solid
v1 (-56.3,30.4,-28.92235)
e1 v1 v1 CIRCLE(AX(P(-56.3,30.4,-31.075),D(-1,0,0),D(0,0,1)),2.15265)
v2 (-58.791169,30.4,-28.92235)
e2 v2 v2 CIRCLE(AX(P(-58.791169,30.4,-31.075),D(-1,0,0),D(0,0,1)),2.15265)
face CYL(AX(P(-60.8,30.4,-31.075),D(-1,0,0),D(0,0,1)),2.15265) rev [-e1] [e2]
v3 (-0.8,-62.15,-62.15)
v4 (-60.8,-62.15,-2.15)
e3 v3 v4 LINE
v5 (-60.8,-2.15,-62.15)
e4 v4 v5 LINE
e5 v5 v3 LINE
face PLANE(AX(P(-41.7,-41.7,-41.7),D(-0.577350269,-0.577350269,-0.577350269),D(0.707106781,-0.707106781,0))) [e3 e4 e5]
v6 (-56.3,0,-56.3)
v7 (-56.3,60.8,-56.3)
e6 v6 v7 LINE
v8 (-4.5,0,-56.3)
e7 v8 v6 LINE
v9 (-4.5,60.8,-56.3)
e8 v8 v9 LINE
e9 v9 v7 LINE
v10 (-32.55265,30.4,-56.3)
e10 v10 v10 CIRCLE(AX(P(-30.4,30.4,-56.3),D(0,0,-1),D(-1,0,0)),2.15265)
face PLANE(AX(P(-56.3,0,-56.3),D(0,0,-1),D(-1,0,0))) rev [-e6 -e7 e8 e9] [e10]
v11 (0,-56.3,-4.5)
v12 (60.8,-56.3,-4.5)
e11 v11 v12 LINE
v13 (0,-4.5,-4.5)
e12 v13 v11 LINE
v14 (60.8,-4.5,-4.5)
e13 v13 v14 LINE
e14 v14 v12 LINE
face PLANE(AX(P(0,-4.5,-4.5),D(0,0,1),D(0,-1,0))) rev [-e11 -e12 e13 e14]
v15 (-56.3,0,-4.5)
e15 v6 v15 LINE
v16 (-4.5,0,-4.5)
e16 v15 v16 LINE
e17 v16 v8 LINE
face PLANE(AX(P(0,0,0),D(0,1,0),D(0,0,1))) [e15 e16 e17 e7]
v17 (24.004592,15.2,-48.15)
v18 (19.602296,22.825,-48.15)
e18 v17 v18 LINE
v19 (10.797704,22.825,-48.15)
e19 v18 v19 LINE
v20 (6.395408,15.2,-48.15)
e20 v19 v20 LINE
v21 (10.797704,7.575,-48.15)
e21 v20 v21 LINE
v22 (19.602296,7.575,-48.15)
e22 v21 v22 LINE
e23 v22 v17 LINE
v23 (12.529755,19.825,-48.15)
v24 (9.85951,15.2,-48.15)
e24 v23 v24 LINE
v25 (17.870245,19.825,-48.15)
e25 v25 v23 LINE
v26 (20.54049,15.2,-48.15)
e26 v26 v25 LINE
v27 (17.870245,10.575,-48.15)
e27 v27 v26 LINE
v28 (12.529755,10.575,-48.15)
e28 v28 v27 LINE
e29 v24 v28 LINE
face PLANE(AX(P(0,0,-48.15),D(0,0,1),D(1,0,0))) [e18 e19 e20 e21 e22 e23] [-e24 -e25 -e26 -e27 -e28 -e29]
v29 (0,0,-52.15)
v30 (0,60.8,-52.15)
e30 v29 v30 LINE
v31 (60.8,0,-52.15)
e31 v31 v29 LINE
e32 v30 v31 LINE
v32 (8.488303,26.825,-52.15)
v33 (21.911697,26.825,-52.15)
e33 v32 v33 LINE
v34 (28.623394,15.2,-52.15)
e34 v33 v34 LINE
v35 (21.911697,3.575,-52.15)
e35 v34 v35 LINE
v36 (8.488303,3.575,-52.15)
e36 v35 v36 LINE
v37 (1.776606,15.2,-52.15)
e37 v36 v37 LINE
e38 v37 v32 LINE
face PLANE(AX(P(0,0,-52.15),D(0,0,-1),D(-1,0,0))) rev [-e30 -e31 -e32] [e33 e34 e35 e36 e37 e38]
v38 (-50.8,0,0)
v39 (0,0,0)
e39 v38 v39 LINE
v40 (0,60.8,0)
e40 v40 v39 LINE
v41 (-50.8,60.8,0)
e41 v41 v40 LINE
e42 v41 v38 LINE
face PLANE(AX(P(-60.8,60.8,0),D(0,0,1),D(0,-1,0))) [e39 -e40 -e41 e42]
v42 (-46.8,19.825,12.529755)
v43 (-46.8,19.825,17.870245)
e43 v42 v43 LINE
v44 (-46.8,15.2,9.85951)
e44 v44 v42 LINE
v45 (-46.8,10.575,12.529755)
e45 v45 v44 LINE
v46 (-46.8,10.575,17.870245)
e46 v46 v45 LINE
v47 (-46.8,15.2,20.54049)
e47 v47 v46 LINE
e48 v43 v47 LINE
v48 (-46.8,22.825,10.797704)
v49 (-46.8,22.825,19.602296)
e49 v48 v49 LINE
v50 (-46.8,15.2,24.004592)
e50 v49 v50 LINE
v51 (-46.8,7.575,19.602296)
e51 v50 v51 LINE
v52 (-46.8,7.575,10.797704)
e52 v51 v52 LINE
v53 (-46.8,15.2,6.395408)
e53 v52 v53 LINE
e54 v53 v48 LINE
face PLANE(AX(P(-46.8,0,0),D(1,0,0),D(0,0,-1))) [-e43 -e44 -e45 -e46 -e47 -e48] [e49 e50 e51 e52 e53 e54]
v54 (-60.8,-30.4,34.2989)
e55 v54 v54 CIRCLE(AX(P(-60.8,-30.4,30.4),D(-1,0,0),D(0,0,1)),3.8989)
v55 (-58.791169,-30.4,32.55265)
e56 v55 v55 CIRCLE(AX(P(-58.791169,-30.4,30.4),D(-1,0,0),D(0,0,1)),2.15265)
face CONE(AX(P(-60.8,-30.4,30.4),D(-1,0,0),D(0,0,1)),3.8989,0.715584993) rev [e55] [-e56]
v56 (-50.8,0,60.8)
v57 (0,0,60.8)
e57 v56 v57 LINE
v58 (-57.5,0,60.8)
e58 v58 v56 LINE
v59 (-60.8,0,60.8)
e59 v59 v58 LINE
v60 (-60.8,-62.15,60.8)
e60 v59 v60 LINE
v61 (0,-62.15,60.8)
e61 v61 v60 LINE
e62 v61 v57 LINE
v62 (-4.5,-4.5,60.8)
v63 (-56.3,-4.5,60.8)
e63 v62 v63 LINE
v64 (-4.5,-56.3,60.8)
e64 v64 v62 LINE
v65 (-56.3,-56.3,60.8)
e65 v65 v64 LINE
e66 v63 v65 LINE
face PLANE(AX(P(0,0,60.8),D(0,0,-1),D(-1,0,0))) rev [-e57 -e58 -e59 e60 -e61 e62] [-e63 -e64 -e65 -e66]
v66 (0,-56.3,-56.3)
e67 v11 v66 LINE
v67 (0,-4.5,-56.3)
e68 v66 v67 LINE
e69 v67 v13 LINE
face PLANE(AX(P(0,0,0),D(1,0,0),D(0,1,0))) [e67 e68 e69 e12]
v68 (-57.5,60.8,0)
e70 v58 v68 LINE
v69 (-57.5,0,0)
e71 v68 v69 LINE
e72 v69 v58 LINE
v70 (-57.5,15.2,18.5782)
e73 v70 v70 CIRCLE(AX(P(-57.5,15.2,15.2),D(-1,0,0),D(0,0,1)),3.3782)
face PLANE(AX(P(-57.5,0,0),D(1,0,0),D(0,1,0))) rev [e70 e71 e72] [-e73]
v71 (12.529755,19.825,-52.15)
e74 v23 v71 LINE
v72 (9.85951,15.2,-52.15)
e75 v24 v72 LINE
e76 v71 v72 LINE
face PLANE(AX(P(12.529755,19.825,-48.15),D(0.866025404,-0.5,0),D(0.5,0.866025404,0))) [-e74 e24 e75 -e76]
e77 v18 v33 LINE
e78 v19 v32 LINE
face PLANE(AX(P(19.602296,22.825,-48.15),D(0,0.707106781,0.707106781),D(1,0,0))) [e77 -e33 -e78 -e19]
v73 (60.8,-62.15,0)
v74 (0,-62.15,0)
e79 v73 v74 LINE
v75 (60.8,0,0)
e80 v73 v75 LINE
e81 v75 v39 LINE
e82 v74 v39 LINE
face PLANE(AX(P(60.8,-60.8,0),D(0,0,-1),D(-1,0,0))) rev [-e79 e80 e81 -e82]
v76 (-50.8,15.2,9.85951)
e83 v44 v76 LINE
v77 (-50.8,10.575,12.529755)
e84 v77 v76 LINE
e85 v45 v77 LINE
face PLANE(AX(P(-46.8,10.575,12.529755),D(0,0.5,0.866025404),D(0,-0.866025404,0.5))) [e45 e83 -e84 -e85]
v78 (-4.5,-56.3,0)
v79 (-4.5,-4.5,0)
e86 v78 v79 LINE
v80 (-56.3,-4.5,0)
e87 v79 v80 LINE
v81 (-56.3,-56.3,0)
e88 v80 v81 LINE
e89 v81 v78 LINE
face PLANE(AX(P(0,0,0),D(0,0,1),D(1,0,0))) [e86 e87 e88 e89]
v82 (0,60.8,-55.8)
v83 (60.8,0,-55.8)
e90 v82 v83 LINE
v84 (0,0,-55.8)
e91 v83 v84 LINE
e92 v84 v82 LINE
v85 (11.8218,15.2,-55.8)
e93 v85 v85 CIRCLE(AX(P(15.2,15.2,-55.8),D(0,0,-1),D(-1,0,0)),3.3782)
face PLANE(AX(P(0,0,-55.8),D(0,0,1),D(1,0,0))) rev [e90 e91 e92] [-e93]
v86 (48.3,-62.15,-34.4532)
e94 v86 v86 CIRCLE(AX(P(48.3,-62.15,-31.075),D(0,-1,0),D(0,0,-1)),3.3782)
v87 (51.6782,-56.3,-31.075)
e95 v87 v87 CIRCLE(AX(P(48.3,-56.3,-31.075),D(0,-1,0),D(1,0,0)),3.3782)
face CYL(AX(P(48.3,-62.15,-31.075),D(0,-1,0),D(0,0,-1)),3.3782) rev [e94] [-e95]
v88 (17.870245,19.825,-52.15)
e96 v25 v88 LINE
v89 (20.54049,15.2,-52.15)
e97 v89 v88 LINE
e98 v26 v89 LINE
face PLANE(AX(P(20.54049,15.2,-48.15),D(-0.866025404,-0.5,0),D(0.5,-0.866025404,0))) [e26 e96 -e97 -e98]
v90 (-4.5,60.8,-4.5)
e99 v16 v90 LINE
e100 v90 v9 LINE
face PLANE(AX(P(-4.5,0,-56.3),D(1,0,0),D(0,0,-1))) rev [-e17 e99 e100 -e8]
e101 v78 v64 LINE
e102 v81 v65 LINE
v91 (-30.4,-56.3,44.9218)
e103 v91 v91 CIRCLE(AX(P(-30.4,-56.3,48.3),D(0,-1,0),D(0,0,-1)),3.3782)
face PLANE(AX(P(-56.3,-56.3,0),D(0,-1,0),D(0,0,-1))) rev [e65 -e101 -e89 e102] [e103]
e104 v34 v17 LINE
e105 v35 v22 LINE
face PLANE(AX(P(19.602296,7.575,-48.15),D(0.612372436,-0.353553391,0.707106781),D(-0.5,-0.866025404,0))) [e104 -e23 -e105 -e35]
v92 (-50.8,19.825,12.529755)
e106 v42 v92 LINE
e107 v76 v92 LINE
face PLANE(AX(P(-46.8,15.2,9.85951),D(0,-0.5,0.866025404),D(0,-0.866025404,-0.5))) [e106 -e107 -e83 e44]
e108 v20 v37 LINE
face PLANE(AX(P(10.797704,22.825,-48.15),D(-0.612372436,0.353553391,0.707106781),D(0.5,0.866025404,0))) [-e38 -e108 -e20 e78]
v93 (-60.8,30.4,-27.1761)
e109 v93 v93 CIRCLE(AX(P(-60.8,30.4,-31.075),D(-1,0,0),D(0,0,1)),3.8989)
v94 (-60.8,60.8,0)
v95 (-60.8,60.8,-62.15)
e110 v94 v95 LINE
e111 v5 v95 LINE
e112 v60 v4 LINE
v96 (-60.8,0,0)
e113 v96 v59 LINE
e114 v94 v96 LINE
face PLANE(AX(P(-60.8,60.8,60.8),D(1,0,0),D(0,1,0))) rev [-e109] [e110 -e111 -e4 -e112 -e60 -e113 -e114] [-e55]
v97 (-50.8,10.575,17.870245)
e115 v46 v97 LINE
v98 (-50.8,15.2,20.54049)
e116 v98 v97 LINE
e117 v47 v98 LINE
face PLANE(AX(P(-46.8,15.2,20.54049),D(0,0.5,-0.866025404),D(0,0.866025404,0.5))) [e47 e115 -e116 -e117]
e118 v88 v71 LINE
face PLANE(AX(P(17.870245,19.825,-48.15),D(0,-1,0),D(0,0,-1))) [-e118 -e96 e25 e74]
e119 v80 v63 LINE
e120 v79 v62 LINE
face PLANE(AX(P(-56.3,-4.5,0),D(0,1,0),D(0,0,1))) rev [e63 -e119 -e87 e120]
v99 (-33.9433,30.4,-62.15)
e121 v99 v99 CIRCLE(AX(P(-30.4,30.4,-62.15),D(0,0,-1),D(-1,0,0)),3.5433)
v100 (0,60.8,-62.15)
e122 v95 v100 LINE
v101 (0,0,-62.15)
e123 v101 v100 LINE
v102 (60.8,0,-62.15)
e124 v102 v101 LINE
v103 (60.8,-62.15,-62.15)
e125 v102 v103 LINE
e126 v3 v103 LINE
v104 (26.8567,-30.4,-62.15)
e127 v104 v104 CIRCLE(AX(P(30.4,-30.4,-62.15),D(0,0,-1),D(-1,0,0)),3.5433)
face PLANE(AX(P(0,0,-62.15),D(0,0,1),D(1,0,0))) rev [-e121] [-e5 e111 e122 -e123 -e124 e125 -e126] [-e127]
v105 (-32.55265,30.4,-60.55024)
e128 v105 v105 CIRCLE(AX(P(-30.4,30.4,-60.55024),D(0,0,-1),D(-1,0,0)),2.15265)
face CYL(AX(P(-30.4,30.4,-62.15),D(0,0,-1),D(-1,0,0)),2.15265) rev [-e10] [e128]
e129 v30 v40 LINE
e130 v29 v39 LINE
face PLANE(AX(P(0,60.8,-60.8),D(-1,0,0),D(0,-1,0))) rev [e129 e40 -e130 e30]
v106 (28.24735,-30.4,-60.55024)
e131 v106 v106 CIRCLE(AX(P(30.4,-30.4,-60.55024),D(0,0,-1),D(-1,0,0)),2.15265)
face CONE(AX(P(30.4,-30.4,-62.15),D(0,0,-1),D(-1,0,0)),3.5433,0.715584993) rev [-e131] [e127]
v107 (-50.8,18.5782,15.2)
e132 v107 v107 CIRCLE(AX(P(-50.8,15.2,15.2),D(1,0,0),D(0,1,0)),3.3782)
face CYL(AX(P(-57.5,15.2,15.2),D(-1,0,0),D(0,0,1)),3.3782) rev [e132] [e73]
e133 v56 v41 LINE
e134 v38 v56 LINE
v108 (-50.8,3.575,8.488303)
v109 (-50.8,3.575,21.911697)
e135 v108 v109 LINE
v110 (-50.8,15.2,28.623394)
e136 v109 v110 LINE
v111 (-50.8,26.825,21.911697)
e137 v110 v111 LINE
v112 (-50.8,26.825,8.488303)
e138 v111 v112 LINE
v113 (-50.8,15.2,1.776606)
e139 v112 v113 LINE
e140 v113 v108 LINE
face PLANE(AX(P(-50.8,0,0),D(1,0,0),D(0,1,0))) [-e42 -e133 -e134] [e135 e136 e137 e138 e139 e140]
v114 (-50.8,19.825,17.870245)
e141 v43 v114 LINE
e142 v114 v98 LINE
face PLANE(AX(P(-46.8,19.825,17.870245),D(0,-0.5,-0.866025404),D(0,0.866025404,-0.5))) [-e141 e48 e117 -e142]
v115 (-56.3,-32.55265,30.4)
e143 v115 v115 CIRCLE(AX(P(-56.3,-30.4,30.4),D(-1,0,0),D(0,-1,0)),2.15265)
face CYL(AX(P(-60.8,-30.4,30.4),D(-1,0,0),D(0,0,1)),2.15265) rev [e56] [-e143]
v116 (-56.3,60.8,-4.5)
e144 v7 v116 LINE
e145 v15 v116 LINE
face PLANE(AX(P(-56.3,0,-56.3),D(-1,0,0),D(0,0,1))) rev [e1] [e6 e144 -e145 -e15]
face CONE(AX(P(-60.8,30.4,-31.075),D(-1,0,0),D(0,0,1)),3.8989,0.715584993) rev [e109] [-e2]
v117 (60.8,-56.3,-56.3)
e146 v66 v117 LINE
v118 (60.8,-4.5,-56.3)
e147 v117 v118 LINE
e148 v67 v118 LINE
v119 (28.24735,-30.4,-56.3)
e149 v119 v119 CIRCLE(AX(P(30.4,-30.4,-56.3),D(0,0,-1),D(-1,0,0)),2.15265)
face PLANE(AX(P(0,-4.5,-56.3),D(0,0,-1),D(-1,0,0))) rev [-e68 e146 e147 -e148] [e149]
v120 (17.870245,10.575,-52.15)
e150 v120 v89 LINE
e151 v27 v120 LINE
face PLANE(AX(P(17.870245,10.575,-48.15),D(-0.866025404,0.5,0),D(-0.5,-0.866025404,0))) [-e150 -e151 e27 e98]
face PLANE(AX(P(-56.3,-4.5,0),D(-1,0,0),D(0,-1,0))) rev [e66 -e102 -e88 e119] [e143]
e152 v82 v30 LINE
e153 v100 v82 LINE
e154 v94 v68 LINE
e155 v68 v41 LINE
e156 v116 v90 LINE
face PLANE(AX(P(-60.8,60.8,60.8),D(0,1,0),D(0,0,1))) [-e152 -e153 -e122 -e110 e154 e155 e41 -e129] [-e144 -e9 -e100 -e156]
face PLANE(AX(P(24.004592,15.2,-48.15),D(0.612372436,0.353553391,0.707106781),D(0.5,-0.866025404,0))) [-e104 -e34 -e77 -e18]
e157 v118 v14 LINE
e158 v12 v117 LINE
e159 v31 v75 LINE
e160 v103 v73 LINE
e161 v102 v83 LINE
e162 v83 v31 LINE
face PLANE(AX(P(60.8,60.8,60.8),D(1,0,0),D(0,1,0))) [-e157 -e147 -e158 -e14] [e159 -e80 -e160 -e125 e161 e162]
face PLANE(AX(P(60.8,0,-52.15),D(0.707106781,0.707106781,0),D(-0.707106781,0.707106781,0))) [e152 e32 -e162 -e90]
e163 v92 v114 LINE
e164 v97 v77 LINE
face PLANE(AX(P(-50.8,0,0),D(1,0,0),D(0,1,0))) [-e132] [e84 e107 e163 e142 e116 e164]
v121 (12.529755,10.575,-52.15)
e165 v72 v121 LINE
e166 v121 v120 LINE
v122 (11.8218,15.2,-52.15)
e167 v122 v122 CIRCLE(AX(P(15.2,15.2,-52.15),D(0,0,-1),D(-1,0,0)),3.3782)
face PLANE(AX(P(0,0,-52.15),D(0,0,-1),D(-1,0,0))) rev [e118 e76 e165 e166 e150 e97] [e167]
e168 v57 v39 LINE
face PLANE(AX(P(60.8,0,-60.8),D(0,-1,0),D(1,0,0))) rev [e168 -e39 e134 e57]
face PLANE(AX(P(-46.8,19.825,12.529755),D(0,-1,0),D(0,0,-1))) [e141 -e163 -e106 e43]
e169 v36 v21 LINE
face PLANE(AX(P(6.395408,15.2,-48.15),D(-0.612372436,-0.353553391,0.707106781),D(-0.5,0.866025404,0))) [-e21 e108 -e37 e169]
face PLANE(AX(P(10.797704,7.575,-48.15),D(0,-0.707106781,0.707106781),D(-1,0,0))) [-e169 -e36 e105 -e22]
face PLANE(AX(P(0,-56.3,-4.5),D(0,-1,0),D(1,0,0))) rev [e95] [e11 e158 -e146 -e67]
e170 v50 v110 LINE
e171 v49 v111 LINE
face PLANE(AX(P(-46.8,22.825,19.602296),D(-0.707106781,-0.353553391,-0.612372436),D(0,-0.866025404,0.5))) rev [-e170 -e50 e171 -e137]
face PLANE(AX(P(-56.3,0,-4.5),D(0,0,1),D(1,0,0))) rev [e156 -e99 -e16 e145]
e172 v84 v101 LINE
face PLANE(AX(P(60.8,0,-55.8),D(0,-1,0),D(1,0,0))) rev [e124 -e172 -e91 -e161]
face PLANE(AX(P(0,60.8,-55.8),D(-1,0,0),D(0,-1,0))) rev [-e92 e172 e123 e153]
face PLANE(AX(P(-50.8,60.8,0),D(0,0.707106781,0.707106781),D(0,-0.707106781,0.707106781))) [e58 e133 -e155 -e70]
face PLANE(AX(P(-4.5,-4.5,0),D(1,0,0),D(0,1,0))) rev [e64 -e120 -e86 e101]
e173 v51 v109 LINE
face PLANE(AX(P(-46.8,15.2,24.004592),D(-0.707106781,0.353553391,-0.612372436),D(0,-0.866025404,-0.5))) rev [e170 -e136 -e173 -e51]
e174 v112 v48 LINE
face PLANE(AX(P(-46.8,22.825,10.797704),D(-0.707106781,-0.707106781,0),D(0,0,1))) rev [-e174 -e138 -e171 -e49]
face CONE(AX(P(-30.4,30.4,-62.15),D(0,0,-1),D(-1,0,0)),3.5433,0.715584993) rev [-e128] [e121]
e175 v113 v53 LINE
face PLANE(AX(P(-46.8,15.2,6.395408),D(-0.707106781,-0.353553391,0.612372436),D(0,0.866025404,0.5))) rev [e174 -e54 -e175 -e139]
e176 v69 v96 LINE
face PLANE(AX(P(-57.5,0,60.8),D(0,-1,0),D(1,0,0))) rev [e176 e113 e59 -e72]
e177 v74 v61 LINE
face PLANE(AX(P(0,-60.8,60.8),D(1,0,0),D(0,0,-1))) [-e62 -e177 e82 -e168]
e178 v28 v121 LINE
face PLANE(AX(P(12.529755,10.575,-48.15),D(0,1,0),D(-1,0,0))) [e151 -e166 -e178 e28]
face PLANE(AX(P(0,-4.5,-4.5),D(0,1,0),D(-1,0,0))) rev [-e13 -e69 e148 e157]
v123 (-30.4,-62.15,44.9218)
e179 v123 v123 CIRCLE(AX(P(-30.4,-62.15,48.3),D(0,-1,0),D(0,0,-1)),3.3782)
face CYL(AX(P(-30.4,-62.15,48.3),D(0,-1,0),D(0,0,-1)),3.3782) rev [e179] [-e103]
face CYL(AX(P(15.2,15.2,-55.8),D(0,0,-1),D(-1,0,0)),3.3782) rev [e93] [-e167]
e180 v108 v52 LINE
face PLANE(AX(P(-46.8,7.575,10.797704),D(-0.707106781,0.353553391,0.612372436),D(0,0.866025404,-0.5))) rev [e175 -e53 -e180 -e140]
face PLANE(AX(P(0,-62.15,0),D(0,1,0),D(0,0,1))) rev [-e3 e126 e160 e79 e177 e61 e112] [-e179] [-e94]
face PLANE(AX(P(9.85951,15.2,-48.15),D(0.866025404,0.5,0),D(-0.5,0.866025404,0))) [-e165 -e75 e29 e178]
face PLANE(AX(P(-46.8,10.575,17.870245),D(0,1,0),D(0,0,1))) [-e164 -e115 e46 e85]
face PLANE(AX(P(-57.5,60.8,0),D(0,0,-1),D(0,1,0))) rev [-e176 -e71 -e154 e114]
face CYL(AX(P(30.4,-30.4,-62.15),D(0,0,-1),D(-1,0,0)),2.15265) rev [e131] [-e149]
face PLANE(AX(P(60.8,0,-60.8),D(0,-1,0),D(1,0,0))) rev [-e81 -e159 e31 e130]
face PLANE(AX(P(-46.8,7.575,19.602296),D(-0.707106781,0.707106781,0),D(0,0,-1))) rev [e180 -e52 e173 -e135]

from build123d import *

# Parameters (mm, degrees)
ESQUISSE1_W                                       = 121.6
ESQUISSE1_H                                       = 121.6
BOSS_EXTRU_1_DEPTH                                = 60.8
ESQUISSE2_W                                       = 60.8
ESQUISSE2_H                                       = 60.8
ENL_V_MAT_EXTRU_1_DEPTH                           = 149.928976361
ESQUISSE3_W                                       = 60.8
ESQUISSE3_H                                       = 60.8
ENL_V_MAT_EXTRU_2_DEPTH                           = 106.3086891
ESQUISSE4_W                                       = 60.8
ESQUISSE4_H                                       = 60.8
ENL_V_MAT_EXTRU_3_DEPTH                           = 106.3086891
ESQUISSE5_W                                       = 51.8
ESQUISSE5_H                                       = 51.8
ENL_V_MAT_EXTRU_4_DEPTH                           = 60.8
ESQUISSE6_W                                       = 51.8
ESQUISSE6_H                                       = 51.8
ENL_V_MAT_EXTRU_5_DEPTH                           = 60.8
ESQUISSE7_W                                       = 51.8
ESQUISSE7_H                                       = 51.8
ENL_V_MAT_EXTRU_6_DEPTH                           = 60.8
BOSS_EXTRU_8_DEPTH                                = 1.35
FRAISAGE_POUR_VIS_T_TE_FRAIS_E_BOMB_E_D           = 4.3053
FRAISAGE_POUR_VIS_T_TE_FRAIS_E_BOMB_E_DEPTH       = 20
FRAISAGE_POUR_VIS_T_TE_FRAIS_E_BOMB_E_CSINK_D     = 7.0866
FRAISAGE_POUR_VIS_T_TE_FRAIS_E_BOMB_E_CSINK_ANGLE = 82
FRAISAGE_POUR_VIS_T_TE_FRAIS_E_BOMB_E_TIP         = 1.293442612
FRAISAGE_POUR_VIS_T_TE_FRAIS_E_6_PAN_D            = 4.3053
FRAISAGE_POUR_VIS_T_TE_FRAIS_E_6_PAN_DEPTH        = 20
FRAISAGE_POUR_VIS_T_TE_FRAIS_E_6_PAN_CSINK_D      = 7.7978
FRAISAGE_POUR_VIS_T_TE_FRAIS_E_6_PAN_CSINK_ANGLE  = 82
FRAISAGE_POUR_VIS_T_TE_FRAIS_E_6_PAN_TIP          = 1.293442612
BOSS_EXTRU_3_DEPTH                                = 10
ENL_V_MAT_EXTRU_13_DEPTH                          = 6.35
BOSS_EXTRU_2_DEPTH                                = 10
ENL_V_MAT_EXTRU_12_DEPTH                          = 3.3
D_GAGEMENT_1_42_D                                 = 6.7564
D_GAGEMENT_1_42_DEPTH                             = 20
D_GAGEMENT_1_42_TIP                               = 2.029827343
D_GAGEMENT_1_43_D                                 = 6.7564
D_GAGEMENT_1_43_DEPTH                             = 20
D_GAGEMENT_1_43_TIP                               = 2.029827343
BOSS_EXTRU_5_DEPTH                                = 4
CHANFREIN3_SIZE                                   = 4
BOSS_EXTRU_6_DEPTH                                = 4
CHANFREIN4_SIZE                                   = 4
BOSS_EXTRU_7_DEPTH                                = 1.35
D_GAGEMENT_1_44_D                                 = 6.7564
D_GAGEMENT_1_44_DEPTH                             = 20
D_GAGEMENT_1_44_TIP                               = 2.029827343
CHANFREIN1_START                                  = -108
CHANFREIN1_OUTLINE_W                              = 77
CHANFREIN1_OUTLINE_H                              = 88
CHANFREIN1_DEPTH                                  = 35.773481324


with BuildPart() as part:
    # Esquisse1 → Boss.-Extru.1 (new, symmetric)
    with BuildSketch(Plane.XY):
        Rectangle(ESQUISSE1_W, ESQUISSE1_H)
    extrude(amount=BOSS_EXTRU_1_DEPTH, both=True)

    # Esquisse2 → Enlèv. mat.-Extru.1 (cut, through all)
    with BuildSketch(Plane.XY.offset(60.8)):
        with Locations((30.4, 30.4)):
            Rectangle(ESQUISSE2_W, ESQUISSE2_H)
    extrude(amount=-ENL_V_MAT_EXTRU_1_DEPTH, mode=Mode.SUBTRACT)

    # Esquisse3 → Enlèv. mat.-Extru.2 (cut, through all)
    with BuildSketch(Plane(origin=(0, 0, 0), x_dir=(0, 0, -1), z_dir=(1, 0, 0))):
        with Locations((-30.4, 30.4)):
            Rectangle(ESQUISSE3_W, ESQUISSE3_H)
    extrude(amount=-ENL_V_MAT_EXTRU_2_DEPTH, mode=Mode.SUBTRACT)

    # Esquisse4 → Enlèv. mat.-Extru.3 (cut, through all)
    with BuildSketch(Plane(origin=(0, 0, 0), x_dir=(1, 0, 0), z_dir=(0, 1, 0))):
        with Locations((30.4, -30.4)):
            Rectangle(ESQUISSE4_W, ESQUISSE4_H)
    extrude(amount=-ENL_V_MAT_EXTRU_3_DEPTH, mode=Mode.SUBTRACT)

    # Esquisse5 → Enlèv. mat.-Extru.4 (cut)
    with BuildSketch(Plane.XY.offset(60.8)):
        with Locations((-30.4, -30.4)):
            Rectangle(ESQUISSE5_W, ESQUISSE5_H)
    extrude(amount=-ENL_V_MAT_EXTRU_4_DEPTH, mode=Mode.SUBTRACT)

    # Esquisse6 → Enlèv. mat.-Extru.5 (cut)
    with BuildSketch(Plane(origin=(60.8, 0, 0), x_dir=(0, 0, -1), z_dir=(1, 0, 0))):
        with Locations((30.4, -30.4)):
            Rectangle(ESQUISSE6_W, ESQUISSE6_H)
    extrude(amount=-ENL_V_MAT_EXTRU_5_DEPTH, mode=Mode.SUBTRACT)

    # Esquisse7 → Enlèv. mat.-Extru.6 (cut)
    with BuildSketch(Plane(origin=(0, 60.8, 0), x_dir=(1, 0, 0), z_dir=(0, 1, 0))):
        with Locations((-30.4, 30.4)):
            Rectangle(ESQUISSE7_W, ESQUISSE7_H)
    extrude(amount=-ENL_V_MAT_EXTRU_6_DEPTH, mode=Mode.SUBTRACT)

    # Esquisse40 → Boss.-Extru.8 (add)
    with BuildSketch(Plane(origin=(0, 0, -60.8), x_dir=(-1, 0, 0), z_dir=(0, 0, -1))):
        Polygon((0, 0), (-60.8, 0), (-60.8, -60.8), (60.8, -60.8), (60.8, 60.8), (0, 60.8), align=None)
    extrude(amount=BOSS_EXTRU_8_DEPTH)

    # Fraisage pour vis à tête fraisée bombée #61
    with Locations(Plane(origin=(0, 0, -62.15), x_dir=(-1, 0, 0), z_dir=(0, 0, -1))):
        with Locations((-30.4, -30.4), (30.4, 30.4)):
            CounterSinkHole(FRAISAGE_POUR_VIS_T_TE_FRAIS_E_BOMB_E_D / 2, FRAISAGE_POUR_VIS_T_TE_FRAIS_E_BOMB_E_CSINK_D / 2, depth=FRAISAGE_POUR_VIS_T_TE_FRAIS_E_BOMB_E_DEPTH, counter_sink_angle=FRAISAGE_POUR_VIS_T_TE_FRAIS_E_BOMB_E_CSINK_ANGLE)
            with Locations((0, 0, -(FRAISAGE_POUR_VIS_T_TE_FRAIS_E_BOMB_E_DEPTH + FRAISAGE_POUR_VIS_T_TE_FRAIS_E_BOMB_E_TIP / 2))):  # 118° drill point
                Cone(0, FRAISAGE_POUR_VIS_T_TE_FRAIS_E_BOMB_E_D / 2, FRAISAGE_POUR_VIS_T_TE_FRAIS_E_BOMB_E_TIP, mode=Mode.SUBTRACT)

    # Fraisage pour vis à tête fraisée à 6 pans creux #61
    with Locations(Plane.ZY.offset(60.8)):
        with Locations((30.4, -30.4), (-31.075, 30.4)):
            CounterSinkHole(FRAISAGE_POUR_VIS_T_TE_FRAIS_E_6_PAN_D / 2, FRAISAGE_POUR_VIS_T_TE_FRAIS_E_6_PAN_CSINK_D / 2, depth=FRAISAGE_POUR_VIS_T_TE_FRAIS_E_6_PAN_DEPTH, counter_sink_angle=FRAISAGE_POUR_VIS_T_TE_FRAIS_E_6_PAN_CSINK_ANGLE)
            with Locations((0, 0, -(FRAISAGE_POUR_VIS_T_TE_FRAIS_E_6_PAN_DEPTH + FRAISAGE_POUR_VIS_T_TE_FRAIS_E_6_PAN_TIP / 2))):  # 118° drill point
                Cone(0, FRAISAGE_POUR_VIS_T_TE_FRAIS_E_6_PAN_D / 2, FRAISAGE_POUR_VIS_T_TE_FRAIS_E_6_PAN_TIP, mode=Mode.SUBTRACT)

    # Esquisse21 → Boss.-Extru.3 (add)
    with BuildSketch(Plane(origin=(0, 0, -62.15), x_dir=(-1, 0, 0), z_dir=(0, 0, -1))):
        Polygon((0, 0), (-60.8, 0), (0, 60.8), align=None)
    extrude(amount=-BOSS_EXTRU_3_DEPTH)

    # Esquisse31 → Enlèv. mat.-Extru.13 (cut)
    with BuildSketch(Plane(origin=(0, 0, -62.15), x_dir=(-1, 0, 0), z_dir=(0, 0, -1))):
        Polygon((0, 60.8), (0, 0), (-60.8, 0), align=None)
    extrude(amount=-ENL_V_MAT_EXTRU_13_DEPTH, mode=Mode.SUBTRACT)

    # Esquisse17 → Boss.-Extru.2 (add)
    with BuildSketch(Plane.ZY.offset(60.8)):
        Polygon((0, 0), (60.8, 0), (0, 60.8), align=None)
    extrude(amount=-BOSS_EXTRU_2_DEPTH)

    # Esquisse26 → Enlèv. mat.-Extru.12 (cut)
    with BuildSketch(Plane.ZY.offset(60.8)):
        Polygon((0, 60.8), (0, 0), (60.8, 0), align=None)
    extrude(amount=-ENL_V_MAT_EXTRU_12_DEPTH, mode=Mode.SUBTRACT)

    # Dégagement 1/42
    with Locations(Plane.ZY.offset(57.5)):
        with Locations((15.2, 15.2)):
            Hole(D_GAGEMENT_1_42_D / 2, depth=D_GAGEMENT_1_42_DEPTH)
            with Locations((0, 0, -(D_GAGEMENT_1_42_DEPTH + D_GAGEMENT_1_42_TIP / 2))):  # 118° drill point
                Cone(0, D_GAGEMENT_1_42_D / 2, D_GAGEMENT_1_42_TIP, mode=Mode.SUBTRACT)

    # Dégagement 1/43
    with Locations(Plane(origin=(0, 0, -55.8), x_dir=(-1, 0, 0), z_dir=(0, 0, -1))):
        with Locations((-15.2, 15.2)):
            Hole(D_GAGEMENT_1_43_D / 2, depth=D_GAGEMENT_1_43_DEPTH)
            with Locations((0, 0, -(D_GAGEMENT_1_43_DEPTH + D_GAGEMENT_1_43_TIP / 2))):  # 118° drill point
                Cone(0, D_GAGEMENT_1_43_D / 2, D_GAGEMENT_1_43_TIP, mode=Mode.SUBTRACT)

    # Esquisse30 → Boss.-Extru.5 (add)
    with BuildSketch(Plane(origin=(-50.8, 0, 0), x_dir=(0, 0, -1), z_dir=(1, 0, 0))):
        Polygon((-6.395408395, 15.2), (-10.797704197, 22.825), (-19.602295803, 22.825), (-24.004591605, 15.2), (-19.602295803, 7.575), (-10.797704197, 7.575), align=None)
        Polygon((-9.85951001, 15.2), (-12.529755005, 19.825), (-17.870244995, 19.825), (-20.54048999, 15.2), (-17.870244995, 10.575), (-12.529755005, 10.575), align=None, mode=Mode.SUBTRACT)
    extrude(amount=BOSS_EXTRU_5_DEPTH)

    # Chanfrein3
    chanfrein3_edges = [part.edges().sort_by_distance(p)[0] for p in [
        (-50.8, 7.575, 15.2),
        (-50.8, 11.3875, 8.596556296),
        (-50.8, 19.0125, 8.596556296),
        (-50.8, 22.825, 15.2),
        (-50.8, 11.3875, 21.803443704),
        (-50.8, 19.0125, 21.803443704),
    ]]
    chamfer(chanfrein3_edges, length=CHANFREIN3_SIZE - 0.0001)  # a hair under: the kernel refuses the full size

    # Esquisse36 → Boss.-Extru.6 (add)
    with BuildSketch(Plane.XY.offset(-52.15)):
        Polygon((19.602295803, 22.825), (10.797704197, 22.825), (6.395408395, 15.2), (10.797704197, 7.575), (19.602295803, 7.575), (24.004591605, 15.2), align=None)
        Polygon((20.54048999, 15.2), (17.870244995, 19.825), (12.529755005, 19.825), (9.85951001, 15.2), (12.529755005, 10.575), (17.870244995, 10.575), align=None, mode=Mode.SUBTRACT)
    extrude(amount=BOSS_EXTRU_6_DEPTH)

    # Chanfrein4
    chanfrein4_edges = [part.edges().sort_by_distance(p)[0] for p in [
        (8.596556296, 11.3875, -52.15),
        (8.596556296, 19.0125, -52.15),
        (15.2, 7.575, -52.15),
        (21.803443704, 11.3875, -52.15),
        (21.803443704, 19.0125, -52.15),
        (15.2, 22.825, -52.15),
    ]]
    chamfer(chanfrein4_edges, length=CHANFREIN4_SIZE - 0.0001)  # a hair under: the kernel refuses the full size

    # Esquisse39 → Boss.-Extru.7 (add)
    with BuildSketch(Plane.XZ.offset(60.8)):
        Polygon((0, 0), (0, 60.8), (-60.8, 60.8), (-60.8, -62.15), (60.8, -62.15), (60.8, 0), align=None)
    extrude(amount=BOSS_EXTRU_7_DEPTH)

    # Dégagement 1/44
    with Locations(Plane(origin=(0, -62.15, 0), x_dir=(-1, 0, 0), z_dir=(0, -1, 0))):
        with Locations((-48.3, 31.075), (30.4, -48.3)):
            Hole(D_GAGEMENT_1_44_D / 2, depth=D_GAGEMENT_1_44_DEPTH)
            with Locations((0, 0, -(D_GAGEMENT_1_44_DEPTH + D_GAGEMENT_1_44_TIP / 2))):  # 118° drill point
                Cone(0, D_GAGEMENT_1_44_D / 2, D_GAGEMENT_1_44_TIP, mode=Mode.SUBTRACT)

    # Chanfrein1: read off the stored shape, not the designer's step
    # Chanfrein1 outline → Chanfrein1 (cut)
    with BuildSketch(Plane(origin=(0, 0, 0), x_dir=(0.816496580927726, -0.40824829046386324, -0.40824829046386263), z_dir=(0.5773502691896256, 0.5773502691896264, 0.5773502691896255)).offset(CHANFREIN1_START)):
        with Locations((13.5, 0)):
            Rectangle(CHANFREIN1_OUTLINE_W, CHANFREIN1_OUTLINE_H)
    extrude(amount=CHANFREIN1_DEPTH, mode=Mode.SUBTRACT)


solid = part.part
